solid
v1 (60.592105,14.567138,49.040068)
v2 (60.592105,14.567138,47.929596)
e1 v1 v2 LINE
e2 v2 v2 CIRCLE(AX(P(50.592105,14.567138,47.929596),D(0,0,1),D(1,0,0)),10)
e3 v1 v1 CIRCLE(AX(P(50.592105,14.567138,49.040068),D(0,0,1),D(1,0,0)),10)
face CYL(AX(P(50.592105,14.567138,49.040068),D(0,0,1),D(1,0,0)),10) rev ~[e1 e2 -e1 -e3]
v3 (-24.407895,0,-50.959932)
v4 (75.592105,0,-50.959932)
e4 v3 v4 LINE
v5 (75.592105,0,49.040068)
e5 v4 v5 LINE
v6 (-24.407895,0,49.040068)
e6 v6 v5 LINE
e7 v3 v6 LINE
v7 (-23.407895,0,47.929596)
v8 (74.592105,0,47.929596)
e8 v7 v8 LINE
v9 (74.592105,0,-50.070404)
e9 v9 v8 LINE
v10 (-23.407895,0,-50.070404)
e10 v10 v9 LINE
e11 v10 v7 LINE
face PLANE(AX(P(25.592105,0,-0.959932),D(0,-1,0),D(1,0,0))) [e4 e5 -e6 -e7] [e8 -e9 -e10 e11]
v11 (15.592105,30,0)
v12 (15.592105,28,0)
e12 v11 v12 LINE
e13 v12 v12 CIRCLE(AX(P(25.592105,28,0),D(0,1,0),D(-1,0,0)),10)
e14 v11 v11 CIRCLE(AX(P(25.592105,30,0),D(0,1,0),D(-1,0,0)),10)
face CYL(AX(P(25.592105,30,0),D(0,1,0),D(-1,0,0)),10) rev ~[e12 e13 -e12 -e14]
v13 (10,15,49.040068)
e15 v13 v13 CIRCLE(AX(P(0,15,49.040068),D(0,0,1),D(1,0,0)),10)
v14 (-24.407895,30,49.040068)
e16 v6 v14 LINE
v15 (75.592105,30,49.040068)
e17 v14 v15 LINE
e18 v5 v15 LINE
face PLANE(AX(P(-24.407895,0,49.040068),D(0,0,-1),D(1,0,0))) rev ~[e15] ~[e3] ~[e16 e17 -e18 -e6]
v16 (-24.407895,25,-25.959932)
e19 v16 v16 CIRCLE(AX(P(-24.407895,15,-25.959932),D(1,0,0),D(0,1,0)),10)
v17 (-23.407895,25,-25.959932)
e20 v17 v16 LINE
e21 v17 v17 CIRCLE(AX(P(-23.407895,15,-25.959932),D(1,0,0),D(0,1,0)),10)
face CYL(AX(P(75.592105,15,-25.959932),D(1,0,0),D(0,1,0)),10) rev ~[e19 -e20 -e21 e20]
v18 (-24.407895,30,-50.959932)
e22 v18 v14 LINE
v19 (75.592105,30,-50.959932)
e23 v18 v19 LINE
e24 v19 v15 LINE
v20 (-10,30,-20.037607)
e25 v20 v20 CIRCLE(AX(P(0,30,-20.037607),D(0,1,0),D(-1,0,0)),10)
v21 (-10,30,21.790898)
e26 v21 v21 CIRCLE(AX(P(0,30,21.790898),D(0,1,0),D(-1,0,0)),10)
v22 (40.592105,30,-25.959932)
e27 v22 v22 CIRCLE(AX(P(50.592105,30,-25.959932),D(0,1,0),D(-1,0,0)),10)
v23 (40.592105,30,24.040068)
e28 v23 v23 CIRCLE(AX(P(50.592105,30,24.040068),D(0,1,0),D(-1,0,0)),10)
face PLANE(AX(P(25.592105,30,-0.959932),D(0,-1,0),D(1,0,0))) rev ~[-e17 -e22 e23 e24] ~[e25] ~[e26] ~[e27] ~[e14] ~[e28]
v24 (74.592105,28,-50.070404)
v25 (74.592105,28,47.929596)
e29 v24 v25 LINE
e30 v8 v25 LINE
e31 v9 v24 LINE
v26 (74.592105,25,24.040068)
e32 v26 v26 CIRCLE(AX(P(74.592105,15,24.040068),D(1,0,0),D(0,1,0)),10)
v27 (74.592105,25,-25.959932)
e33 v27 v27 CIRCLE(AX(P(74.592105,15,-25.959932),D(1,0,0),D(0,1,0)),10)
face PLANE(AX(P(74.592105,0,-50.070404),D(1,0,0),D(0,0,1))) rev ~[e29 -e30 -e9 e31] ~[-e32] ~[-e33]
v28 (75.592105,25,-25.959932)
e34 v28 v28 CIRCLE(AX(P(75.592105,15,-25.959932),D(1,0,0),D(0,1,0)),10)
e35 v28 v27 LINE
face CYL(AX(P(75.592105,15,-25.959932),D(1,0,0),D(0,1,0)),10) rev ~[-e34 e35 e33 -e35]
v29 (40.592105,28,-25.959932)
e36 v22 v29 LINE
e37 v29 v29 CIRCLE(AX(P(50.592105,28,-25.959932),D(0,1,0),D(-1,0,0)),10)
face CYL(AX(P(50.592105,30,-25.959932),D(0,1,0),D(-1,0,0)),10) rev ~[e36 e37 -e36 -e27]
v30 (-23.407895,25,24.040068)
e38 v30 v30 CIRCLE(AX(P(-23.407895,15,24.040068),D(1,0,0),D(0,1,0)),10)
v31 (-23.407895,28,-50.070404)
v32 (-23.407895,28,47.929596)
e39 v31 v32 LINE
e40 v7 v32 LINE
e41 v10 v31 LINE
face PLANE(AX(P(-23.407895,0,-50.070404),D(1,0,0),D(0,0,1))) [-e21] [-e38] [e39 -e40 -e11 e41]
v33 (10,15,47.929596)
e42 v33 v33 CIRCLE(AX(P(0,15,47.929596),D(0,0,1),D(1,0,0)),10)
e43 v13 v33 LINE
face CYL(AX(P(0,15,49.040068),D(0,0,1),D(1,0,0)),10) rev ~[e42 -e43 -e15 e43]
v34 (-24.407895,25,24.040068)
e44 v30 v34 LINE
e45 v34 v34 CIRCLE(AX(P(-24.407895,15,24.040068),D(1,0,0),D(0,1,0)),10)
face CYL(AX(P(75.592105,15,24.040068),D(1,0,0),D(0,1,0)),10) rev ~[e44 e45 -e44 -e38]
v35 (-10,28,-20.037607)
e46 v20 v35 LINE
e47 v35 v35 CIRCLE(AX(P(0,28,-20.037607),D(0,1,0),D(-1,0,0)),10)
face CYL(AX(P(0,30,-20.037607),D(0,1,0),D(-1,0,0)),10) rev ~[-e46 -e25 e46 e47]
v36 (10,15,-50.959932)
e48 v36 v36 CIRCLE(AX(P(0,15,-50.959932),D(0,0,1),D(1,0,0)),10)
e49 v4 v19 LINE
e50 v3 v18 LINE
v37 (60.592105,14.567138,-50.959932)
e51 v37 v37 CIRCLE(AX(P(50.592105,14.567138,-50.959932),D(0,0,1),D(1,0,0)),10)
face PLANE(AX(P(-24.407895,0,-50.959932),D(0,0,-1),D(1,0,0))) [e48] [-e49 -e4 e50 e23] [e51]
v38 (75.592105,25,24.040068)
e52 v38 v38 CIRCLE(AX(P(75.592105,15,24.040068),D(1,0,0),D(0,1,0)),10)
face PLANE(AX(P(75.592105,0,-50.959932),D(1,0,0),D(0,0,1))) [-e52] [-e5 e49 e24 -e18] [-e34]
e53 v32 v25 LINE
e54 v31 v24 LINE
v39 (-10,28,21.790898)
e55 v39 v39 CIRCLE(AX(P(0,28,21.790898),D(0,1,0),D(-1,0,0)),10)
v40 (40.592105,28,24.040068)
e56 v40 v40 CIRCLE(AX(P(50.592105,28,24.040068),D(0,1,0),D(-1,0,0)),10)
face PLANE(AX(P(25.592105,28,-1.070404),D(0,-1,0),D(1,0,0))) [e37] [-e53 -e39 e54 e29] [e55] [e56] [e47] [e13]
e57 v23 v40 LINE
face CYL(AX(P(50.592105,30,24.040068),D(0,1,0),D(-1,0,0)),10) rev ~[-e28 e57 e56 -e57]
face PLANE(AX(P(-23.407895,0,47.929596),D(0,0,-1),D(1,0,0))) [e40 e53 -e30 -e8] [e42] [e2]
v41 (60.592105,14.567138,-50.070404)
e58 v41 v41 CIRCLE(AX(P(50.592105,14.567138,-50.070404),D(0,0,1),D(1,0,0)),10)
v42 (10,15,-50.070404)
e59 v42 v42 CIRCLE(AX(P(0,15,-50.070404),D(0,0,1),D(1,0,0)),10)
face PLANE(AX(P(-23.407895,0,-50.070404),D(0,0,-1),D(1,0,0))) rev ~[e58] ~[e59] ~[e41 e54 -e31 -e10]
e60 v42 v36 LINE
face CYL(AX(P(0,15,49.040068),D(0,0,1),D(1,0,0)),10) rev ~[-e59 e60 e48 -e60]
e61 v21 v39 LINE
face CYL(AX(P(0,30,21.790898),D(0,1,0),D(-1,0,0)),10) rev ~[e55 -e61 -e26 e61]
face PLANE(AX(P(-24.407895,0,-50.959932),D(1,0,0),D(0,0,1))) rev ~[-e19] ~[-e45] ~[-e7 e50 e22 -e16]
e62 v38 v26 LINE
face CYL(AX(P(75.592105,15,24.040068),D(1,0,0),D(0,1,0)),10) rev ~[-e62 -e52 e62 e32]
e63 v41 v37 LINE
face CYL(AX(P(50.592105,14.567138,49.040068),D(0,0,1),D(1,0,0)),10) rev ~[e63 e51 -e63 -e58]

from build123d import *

# Parameters (mm, degrees)
F0_W     = 100
F0_H     = 100
F1_DEPTH = 30
F2_R     = 10
F3_DEPTH = 100
F4_R     = 10
F5_DEPTH = 100
F6_W     = 98
F6_H     = 98
F7_DEPTH = 28
F8_R     = 10
F9_DEPTH = 3


# Not quite as in the source:
# - a feature names something its author has since deleted; it is built from what else it names


with BuildPart() as f1:
    # F0 (on Front) → F1 (new body)
    with BuildSketch(Plane.XZ):
        with Locations((25.5921050906, -0.9599315155)):
            Rectangle(F0_W, F0_H)
    extrude(amount=-F1_DEPTH)

    # F2 (on face) → F3 (cut)
    with BuildSketch(Plane.YZ.offset(75.5921050906)):
        with Locations((15, 24.0400684845)):
            Circle(F2_R)
        with Locations((15, -25.9599315155)):
            Circle(F2_R)
    extrude(amount=-F3_DEPTH, mode=Mode.SUBTRACT)

    # F4 (on face) → F5 (cut)
    with BuildSketch(Plane.XY.offset(49.0400684845)):
        with Locations((0, 15)):
            Circle(F4_R)
        with Locations((50.5921050906, 14.5671376958)):
            Circle(F4_R)
    extrude(amount=-F5_DEPTH, mode=Mode.SUBTRACT)

    # F6 (on face) → F7 (cut)
    with BuildSketch(Plane.XZ):
        with Locations((25.5921050906, -1.0704044253)):
            Rectangle(F6_W, F6_H)
    extrude(amount=-F7_DEPTH, mode=Mode.SUBTRACT)

    # F8 (on face) → F9 (cut)
    with BuildSketch(Plane(origin=(0, 30, 0), x_dir=(-1, 0, 0), z_dir=(0, 1, 0))):
        with Locations((0, -20.037606527)):
            Circle(F8_R)
        with Locations((0, 21.7908981225)):
            Circle(F8_R)
        with Locations((-25.5921050906, 0)):
            Circle(F8_R)
        with Locations((-50.5921050906, 24.0400684845)):
            Circle(F8_R)
        with Locations((-50.5921050906, -25.9599315155)):
            Circle(F8_R)
    extrude(amount=-F9_DEPTH, mode=Mode.SUBTRACT)


solid = f1.part
